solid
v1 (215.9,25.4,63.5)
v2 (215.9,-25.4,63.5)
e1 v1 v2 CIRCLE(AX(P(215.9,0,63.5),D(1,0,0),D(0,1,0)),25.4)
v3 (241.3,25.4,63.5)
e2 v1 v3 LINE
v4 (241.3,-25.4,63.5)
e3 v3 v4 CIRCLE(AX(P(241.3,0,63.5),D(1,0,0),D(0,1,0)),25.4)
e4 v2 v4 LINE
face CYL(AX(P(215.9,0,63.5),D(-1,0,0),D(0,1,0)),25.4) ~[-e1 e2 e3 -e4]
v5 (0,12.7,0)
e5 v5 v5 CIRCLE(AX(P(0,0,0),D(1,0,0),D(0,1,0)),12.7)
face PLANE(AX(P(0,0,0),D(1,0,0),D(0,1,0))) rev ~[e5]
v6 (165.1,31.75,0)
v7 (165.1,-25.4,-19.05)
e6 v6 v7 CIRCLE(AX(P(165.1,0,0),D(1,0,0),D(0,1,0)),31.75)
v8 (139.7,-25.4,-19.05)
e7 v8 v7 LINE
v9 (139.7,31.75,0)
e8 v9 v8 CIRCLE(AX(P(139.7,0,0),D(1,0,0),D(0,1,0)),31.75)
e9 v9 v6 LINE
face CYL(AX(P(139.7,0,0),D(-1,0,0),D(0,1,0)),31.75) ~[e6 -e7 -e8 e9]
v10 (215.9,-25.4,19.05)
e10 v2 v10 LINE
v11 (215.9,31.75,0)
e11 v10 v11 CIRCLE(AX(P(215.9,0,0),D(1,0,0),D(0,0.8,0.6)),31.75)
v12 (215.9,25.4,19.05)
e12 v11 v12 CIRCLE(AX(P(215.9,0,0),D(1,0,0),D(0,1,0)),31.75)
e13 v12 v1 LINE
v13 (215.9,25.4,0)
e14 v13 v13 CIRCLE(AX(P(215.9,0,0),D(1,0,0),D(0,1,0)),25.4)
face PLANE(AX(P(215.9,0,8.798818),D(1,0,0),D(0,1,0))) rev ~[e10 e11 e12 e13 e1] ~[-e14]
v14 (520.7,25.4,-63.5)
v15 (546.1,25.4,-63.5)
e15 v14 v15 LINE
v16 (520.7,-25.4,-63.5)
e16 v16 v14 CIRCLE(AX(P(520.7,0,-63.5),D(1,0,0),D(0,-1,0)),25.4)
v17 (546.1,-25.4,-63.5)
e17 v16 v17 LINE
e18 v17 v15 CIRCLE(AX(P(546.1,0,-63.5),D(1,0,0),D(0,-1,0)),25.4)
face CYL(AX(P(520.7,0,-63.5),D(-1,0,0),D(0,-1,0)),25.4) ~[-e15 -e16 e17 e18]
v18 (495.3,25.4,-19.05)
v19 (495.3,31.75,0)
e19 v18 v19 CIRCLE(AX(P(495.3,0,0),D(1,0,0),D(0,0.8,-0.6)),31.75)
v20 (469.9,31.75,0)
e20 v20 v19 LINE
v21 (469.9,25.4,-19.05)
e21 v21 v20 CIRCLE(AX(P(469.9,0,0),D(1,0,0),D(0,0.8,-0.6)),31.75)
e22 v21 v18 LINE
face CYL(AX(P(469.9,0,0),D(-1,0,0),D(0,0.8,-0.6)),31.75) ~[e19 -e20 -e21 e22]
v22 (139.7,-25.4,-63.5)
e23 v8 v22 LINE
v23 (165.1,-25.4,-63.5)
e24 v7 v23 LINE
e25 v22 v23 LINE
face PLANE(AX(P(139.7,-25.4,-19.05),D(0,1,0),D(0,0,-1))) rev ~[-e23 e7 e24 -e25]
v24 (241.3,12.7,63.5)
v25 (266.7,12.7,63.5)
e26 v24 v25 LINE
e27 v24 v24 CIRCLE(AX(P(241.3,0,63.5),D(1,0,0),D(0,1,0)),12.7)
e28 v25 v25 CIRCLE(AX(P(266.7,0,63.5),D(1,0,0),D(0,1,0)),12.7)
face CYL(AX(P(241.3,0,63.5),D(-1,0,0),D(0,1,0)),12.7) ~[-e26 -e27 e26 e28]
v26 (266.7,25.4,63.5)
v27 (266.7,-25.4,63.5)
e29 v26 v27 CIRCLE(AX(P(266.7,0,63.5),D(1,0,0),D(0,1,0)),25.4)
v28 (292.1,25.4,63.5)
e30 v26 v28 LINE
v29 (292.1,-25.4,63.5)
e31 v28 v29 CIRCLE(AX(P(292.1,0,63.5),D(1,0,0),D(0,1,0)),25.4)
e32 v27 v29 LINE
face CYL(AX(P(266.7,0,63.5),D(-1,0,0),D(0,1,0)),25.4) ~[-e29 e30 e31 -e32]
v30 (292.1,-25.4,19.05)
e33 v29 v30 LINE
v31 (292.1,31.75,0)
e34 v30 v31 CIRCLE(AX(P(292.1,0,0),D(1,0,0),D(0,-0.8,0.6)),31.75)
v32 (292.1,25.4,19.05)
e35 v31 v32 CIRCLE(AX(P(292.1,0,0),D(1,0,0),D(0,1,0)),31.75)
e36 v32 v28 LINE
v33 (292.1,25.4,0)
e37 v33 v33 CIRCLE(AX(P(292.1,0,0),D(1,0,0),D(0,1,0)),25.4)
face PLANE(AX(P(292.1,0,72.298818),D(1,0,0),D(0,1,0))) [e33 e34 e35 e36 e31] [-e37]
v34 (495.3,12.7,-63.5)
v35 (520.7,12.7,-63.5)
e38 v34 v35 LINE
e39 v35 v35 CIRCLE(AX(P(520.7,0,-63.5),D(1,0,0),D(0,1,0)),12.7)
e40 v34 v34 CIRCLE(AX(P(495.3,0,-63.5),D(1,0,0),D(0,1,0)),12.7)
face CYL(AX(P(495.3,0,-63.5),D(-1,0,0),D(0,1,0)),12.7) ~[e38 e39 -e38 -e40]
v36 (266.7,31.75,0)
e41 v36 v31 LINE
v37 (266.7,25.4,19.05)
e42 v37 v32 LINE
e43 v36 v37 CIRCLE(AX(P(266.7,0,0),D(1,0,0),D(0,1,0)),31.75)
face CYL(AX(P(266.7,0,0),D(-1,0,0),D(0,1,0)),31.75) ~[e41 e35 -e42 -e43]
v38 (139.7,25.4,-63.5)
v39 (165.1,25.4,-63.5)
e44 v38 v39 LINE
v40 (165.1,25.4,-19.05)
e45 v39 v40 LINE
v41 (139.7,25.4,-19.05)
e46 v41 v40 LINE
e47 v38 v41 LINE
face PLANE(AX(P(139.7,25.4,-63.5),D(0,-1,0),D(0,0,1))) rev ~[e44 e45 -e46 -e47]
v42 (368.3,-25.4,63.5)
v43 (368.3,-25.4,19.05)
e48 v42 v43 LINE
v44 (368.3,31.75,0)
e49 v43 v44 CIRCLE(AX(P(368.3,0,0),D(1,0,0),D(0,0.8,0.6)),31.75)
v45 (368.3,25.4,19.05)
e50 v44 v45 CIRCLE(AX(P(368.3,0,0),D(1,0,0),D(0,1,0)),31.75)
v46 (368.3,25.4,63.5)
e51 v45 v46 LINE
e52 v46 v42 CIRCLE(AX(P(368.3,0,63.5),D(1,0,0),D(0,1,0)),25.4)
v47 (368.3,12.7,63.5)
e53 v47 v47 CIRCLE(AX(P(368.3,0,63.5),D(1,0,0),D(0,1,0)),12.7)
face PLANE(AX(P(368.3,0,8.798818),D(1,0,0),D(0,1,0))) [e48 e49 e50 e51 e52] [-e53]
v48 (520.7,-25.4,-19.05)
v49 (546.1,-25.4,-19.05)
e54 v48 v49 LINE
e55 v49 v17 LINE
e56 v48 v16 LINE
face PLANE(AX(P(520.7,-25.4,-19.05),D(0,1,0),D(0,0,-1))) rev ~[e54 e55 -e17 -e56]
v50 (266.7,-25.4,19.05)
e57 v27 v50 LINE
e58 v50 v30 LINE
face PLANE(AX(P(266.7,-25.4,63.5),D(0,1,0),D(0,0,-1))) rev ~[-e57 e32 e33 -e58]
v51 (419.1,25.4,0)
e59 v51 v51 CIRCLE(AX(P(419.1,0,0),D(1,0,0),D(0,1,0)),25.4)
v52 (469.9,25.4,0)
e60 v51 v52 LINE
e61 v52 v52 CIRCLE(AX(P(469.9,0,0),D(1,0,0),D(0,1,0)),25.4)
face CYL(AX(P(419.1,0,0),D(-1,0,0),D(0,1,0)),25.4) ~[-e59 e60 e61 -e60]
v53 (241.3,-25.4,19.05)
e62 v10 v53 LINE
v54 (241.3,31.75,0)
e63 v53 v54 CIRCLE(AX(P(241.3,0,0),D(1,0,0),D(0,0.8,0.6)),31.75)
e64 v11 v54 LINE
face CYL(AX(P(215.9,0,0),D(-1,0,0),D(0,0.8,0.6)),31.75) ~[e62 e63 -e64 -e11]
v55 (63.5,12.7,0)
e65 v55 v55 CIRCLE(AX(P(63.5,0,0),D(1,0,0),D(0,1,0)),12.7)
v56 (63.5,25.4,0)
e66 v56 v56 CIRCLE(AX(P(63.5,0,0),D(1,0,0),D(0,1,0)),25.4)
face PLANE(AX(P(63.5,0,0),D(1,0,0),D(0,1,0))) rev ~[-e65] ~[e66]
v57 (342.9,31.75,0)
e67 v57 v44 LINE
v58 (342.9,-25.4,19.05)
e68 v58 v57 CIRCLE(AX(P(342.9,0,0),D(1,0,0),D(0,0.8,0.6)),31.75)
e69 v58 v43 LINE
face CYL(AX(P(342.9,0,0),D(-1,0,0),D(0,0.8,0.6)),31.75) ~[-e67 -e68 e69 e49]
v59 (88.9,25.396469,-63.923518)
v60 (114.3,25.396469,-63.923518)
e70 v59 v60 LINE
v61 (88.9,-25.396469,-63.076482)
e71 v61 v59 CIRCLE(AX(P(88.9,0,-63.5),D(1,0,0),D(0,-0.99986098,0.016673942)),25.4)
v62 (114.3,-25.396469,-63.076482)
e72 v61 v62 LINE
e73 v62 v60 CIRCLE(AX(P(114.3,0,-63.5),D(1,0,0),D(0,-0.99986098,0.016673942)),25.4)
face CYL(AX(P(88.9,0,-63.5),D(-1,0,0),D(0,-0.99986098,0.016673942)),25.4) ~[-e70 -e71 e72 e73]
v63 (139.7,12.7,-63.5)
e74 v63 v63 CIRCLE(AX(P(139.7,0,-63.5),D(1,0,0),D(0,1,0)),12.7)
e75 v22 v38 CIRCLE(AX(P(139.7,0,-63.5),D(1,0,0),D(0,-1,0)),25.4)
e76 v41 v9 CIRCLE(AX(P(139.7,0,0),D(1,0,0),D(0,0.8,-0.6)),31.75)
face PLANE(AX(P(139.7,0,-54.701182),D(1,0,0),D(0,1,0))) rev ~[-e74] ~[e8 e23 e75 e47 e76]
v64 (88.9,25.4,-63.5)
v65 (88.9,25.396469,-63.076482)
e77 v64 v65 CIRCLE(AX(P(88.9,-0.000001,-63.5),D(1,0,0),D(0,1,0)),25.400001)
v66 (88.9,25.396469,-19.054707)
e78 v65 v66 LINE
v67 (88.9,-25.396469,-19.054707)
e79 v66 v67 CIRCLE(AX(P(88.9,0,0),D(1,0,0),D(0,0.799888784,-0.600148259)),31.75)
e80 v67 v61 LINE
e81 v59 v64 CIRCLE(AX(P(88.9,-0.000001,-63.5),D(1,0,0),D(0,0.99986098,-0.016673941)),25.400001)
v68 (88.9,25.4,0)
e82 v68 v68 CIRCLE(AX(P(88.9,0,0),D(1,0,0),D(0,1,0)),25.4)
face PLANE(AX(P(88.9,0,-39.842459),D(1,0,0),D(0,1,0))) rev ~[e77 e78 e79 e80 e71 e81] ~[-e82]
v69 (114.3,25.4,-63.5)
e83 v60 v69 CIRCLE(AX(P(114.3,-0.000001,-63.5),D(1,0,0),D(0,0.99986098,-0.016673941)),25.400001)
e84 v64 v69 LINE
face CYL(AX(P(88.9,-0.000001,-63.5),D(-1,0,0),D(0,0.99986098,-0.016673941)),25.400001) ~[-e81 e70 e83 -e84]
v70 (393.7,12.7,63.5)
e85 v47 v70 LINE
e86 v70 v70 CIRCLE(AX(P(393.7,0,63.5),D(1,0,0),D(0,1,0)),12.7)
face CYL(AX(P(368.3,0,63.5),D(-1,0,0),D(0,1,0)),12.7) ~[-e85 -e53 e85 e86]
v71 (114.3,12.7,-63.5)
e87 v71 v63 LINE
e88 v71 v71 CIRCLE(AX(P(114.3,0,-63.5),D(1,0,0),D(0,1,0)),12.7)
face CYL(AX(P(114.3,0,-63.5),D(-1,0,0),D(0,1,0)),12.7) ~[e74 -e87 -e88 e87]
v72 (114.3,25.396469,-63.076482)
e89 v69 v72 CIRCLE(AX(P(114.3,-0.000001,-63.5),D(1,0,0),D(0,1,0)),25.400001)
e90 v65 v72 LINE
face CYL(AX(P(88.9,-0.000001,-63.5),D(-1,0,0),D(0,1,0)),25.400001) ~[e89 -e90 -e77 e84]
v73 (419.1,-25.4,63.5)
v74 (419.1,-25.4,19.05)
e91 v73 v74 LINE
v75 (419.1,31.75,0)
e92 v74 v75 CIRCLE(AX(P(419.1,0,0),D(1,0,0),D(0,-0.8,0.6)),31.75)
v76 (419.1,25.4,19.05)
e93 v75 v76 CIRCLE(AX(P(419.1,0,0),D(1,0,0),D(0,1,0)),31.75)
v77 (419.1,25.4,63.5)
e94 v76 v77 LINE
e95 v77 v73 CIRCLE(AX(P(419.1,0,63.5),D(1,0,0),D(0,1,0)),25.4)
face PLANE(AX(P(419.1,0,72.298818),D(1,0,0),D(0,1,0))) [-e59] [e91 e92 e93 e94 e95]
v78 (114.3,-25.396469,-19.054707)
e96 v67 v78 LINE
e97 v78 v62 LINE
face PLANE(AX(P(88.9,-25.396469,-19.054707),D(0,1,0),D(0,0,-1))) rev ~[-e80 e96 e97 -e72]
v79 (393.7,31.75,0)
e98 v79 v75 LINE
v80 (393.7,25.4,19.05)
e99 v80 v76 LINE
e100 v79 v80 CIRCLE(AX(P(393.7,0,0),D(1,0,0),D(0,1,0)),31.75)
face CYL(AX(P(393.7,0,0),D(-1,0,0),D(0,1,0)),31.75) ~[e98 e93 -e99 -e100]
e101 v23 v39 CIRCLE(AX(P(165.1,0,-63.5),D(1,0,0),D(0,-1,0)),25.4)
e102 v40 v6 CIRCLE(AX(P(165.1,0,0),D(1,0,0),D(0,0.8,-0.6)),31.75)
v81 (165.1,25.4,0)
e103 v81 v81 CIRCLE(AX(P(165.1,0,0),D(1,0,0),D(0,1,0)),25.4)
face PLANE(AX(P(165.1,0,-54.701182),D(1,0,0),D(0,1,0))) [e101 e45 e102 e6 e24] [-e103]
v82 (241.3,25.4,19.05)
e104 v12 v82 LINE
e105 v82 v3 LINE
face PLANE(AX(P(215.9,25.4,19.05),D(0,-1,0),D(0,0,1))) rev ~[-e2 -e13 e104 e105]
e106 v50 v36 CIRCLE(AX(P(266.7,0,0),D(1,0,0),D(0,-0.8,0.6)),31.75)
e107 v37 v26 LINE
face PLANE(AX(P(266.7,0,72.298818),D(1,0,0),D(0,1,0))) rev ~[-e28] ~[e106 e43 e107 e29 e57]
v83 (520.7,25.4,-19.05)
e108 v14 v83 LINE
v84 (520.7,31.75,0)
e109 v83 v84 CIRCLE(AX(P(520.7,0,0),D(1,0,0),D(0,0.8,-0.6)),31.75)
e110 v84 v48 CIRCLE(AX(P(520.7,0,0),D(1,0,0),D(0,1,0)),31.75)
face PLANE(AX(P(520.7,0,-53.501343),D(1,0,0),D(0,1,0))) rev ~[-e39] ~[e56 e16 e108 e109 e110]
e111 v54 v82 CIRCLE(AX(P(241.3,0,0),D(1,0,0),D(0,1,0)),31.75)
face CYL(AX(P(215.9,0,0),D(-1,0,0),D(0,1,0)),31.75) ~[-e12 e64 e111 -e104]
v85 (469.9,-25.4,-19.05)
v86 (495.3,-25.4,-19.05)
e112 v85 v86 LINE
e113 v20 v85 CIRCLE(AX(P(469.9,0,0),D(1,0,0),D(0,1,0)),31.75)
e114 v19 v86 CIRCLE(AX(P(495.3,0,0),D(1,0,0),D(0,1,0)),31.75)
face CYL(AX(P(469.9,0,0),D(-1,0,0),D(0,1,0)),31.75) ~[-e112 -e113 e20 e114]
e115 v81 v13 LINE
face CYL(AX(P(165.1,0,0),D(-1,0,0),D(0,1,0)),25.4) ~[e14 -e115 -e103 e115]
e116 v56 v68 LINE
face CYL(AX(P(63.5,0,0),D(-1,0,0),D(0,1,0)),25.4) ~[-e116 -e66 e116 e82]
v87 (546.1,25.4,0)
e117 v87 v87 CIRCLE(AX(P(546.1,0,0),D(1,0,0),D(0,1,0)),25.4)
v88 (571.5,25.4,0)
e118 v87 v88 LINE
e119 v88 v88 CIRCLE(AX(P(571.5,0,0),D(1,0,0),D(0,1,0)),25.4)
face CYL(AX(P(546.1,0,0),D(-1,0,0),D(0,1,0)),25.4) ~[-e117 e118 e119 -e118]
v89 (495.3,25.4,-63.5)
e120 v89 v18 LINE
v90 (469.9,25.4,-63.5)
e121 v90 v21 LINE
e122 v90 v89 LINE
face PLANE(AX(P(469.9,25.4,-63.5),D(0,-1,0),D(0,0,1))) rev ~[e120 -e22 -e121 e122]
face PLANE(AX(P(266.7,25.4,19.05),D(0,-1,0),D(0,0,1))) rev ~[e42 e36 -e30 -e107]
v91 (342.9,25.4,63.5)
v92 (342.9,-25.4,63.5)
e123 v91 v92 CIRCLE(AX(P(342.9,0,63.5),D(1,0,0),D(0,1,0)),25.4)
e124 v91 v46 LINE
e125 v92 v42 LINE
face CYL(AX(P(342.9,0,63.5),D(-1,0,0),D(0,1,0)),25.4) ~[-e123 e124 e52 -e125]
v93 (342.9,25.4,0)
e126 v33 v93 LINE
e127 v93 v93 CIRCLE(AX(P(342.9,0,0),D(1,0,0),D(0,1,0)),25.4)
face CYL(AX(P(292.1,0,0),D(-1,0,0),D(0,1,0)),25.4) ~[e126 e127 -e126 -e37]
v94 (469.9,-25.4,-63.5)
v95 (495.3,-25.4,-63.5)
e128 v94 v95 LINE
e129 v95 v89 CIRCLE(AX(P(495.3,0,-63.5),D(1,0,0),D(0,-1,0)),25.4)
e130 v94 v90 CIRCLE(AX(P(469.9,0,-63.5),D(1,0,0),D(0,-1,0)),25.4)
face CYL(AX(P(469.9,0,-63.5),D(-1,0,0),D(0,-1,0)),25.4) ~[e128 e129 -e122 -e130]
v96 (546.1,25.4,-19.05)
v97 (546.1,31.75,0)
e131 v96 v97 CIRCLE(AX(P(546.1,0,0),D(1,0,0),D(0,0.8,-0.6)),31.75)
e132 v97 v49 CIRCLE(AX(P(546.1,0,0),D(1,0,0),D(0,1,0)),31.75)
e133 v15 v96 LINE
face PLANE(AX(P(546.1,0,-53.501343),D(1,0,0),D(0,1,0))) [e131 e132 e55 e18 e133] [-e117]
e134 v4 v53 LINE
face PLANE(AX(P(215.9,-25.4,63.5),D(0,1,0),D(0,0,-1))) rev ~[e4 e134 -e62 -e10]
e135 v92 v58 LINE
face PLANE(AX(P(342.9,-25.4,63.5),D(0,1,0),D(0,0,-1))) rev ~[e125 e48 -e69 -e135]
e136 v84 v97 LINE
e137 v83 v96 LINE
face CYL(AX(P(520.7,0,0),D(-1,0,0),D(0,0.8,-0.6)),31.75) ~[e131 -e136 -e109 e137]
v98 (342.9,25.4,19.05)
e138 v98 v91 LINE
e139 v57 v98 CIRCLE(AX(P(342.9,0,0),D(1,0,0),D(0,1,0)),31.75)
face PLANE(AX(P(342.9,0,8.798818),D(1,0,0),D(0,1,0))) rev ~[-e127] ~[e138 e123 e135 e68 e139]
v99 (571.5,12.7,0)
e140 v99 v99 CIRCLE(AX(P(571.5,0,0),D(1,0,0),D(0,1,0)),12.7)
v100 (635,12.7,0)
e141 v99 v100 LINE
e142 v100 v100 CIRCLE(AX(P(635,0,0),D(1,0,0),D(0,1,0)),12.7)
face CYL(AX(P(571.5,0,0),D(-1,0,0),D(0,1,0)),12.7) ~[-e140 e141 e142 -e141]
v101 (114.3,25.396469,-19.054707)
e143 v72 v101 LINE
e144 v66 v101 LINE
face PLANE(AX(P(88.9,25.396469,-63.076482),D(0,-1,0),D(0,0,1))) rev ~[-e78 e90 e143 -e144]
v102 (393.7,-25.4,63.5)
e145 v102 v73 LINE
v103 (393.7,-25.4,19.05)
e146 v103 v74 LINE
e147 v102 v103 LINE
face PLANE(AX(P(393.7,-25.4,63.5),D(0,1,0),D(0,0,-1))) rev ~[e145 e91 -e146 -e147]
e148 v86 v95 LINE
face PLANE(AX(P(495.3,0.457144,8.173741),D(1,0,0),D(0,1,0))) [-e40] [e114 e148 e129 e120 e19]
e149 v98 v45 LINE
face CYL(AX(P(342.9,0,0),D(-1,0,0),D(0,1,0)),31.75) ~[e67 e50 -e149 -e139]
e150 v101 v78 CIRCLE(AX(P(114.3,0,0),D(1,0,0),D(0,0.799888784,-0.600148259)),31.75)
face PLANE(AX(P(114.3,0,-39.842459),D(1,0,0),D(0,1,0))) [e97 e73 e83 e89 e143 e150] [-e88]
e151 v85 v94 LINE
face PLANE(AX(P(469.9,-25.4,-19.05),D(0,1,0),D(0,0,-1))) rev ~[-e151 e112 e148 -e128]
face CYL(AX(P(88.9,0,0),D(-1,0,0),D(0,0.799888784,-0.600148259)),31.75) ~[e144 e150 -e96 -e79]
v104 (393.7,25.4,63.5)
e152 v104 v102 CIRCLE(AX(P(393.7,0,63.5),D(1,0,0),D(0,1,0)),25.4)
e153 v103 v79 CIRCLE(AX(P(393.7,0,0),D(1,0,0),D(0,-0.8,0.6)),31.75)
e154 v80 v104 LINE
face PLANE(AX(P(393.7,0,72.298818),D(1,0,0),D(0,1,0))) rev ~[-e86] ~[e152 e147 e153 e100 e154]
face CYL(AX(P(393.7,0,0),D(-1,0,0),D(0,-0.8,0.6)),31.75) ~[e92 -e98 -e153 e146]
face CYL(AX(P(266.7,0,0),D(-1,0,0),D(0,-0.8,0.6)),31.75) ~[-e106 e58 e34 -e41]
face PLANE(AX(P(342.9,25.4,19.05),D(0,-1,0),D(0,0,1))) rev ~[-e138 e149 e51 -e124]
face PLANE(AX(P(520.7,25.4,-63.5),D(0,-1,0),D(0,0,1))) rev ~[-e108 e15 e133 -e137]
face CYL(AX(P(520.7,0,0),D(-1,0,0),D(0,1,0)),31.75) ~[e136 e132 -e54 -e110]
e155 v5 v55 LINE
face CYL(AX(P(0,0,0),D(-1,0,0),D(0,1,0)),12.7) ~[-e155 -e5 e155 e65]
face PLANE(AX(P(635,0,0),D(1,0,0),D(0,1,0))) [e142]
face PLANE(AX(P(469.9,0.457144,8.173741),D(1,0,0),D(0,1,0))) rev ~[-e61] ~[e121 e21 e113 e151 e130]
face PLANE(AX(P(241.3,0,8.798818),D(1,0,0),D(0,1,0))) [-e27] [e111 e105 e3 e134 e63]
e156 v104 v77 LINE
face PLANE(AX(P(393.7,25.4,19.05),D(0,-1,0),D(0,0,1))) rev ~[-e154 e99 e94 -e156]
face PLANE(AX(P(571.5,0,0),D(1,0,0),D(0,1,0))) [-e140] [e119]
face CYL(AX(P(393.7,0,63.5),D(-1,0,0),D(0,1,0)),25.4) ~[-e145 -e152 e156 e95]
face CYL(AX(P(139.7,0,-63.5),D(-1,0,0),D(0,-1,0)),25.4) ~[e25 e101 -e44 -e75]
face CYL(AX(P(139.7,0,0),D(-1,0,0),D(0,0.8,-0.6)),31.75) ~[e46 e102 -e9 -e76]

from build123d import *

# Parameters (mm, degrees)
F0_R      = 12.7
F1_DEPTH  = 63.5
F3_R      = 25.4
F4_DEPTH  = 25.4
F6_DEPTH  = 25.4
F7_R      = 12.7
F8_DEPTH  = 25.4
F10_DEPTH = 25.4
F11_R     = 25.4
F12_DEPTH = 50.8
F14_DEPTH = 25.4
F15_R     = 12.7
F16_DEPTH = 25.4
F18_DEPTH = 25.4
F19_R     = 25.4
F20_DEPTH = 50.8
F22_DEPTH = 25.4
F23_R     = 12.7
F24_DEPTH = 25.4
F26_DEPTH = 25.4
F27_R     = 25.4
F28_DEPTH = 50.8
F30_DEPTH = 25.4
F31_R     = 12.7
F32_DEPTH = 25.4
F34_DEPTH = 25.4
F35_R     = 25.4
F36_DEPTH = 25.4
F37_R     = 12.7
F38_DEPTH = 63.5


with BuildPart() as f1:
    # F0 (on Right) → F1 (new body)
    with BuildSketch(Plane.YZ):
        Circle(F0_R)
    extrude(amount=F1_DEPTH)

    # F3 (on face) → F4 (join)
    with BuildSketch(Plane.YZ.offset(63.5)):
        Circle(F3_R)
    extrude(amount=F4_DEPTH)

    # F5 (on face) → F6 (join)
    with BuildSketch(Plane.YZ.offset(88.9)):
        with BuildLine():
            ThreePointArc((25.3964688963, -19.0547072295), (0, -31.75), (-25.3964688963, -19.0547072295))
            Line((-25.3964688963, -19.0547072295), (-25.3964688963, -63.0764818772))
            ThreePointArc((-25.3964688963, -63.0764818772), (0, -38.1), (25.3964688963, -63.0764818772))
            Line((25.3964688963, -63.0764818772), (25.3964688963, -19.0547072295))
        make_face()
        with BuildLine():
            ThreePointArc((31.75, 0), (-10.0430227657, 30.1197641712), (-25.3964688963, -19.0547072295))
            ThreePointArc((-25.3964688963, -19.0547072295), (0, -31.75), (25.3964688963, -19.0547072295))
            ThreePointArc((25.3964688963, -19.0547072295), (30.1197641712, -10.0430227657), (31.75, 0))
        make_face()
        with BuildLine():
            ThreePointArc((25.3964688963, -63.0764818772), (0, -38.1), (-25.3964688963, -63.0764818772))
            Line((-25.3964688963, -63.0764818772), (25.3964688963, -63.9235181228))
            Line((25.3964688963, -63.9235181228), (25.3964688963, -63.0764818772))
        make_face()
        with BuildLine():
            Line((25.3964688963, -63.9235181228), (-25.3964688963, -63.0764818772))
            ThreePointArc((-25.3964688963, -63.0764818772), (-0.4235181228, -88.8964688963), (25.3964688963, -63.9235181228))
        make_face()
        with BuildLine():
            Line((25.3964688963, -63.0764818772), (25.3964688963, -63.9235181228))
            ThreePointArc((25.3964688963, -63.9235181228), (25.3991172087, -63.7117664215), (25.4, -63.5))
            ThreePointArc((25.4, -63.5), (25.3991172087, -63.2882335785), (25.3964688963, -63.0764818772))
        make_face()
    extrude(amount=F6_DEPTH)

    # F7 (on face) → F8 (join)
    with BuildSketch(Plane.YZ.offset(114.3)):
        with Locations((0, -63.5)):
            Circle(F7_R)
    extrude(amount=F8_DEPTH)

    # F9 (on face) → F10 (join)
    with BuildSketch(Plane.YZ.offset(139.7)):
        with BuildLine():
            Line((0, -63.5), (25.4, -63.5))
            ThreePointArc((25.4, -63.5), (0, -38.1), (-25.4, -63.5))
            Line((-25.4, -63.5), (0, -63.5))
        make_face()
        with BuildLine():
            ThreePointArc((-25.4, -63.5), (0, -88.9), (25.4, -63.5))
            Line((25.4, -63.5), (0, -63.5))
            Line((0, -63.5), (-25.4, -63.5))
        make_face()
        with BuildLine():
            ThreePointArc((-25.4, -63.5), (0, -38.1), (25.4, -63.5))
            Line((25.4, -63.5), (25.4, -19.05))
            ThreePointArc((25.4, -19.05), (0, -31.75), (-25.4, -19.05))
            Line((-25.4, -19.05), (-25.4, -63.5))
        make_face()
        with BuildLine():
            ThreePointArc((-25.4, -19.05), (0, -31.75), (25.4, -19.05))
            Line((25.4, -19.05), (25.4, 0))
            ThreePointArc((25.4, 0), (0, -25.4), (-25.4, 0))
            Line((-25.4, 0), (-25.4, -19.05))
        make_face()
        with BuildLine():
            Line((25.4, 0), (25.4, -19.05))
            ThreePointArc((25.4, -19.05), (30.1206947131, -10.040231571), (31.75, 0))
            ThreePointArc((31.75, 0), (-10.040231571, 30.1206947131), (-25.4, -19.05))
            Line((-25.4, -19.05), (-25.4, 0))
            ThreePointArc((-25.4, 0), (0, 25.4), (25.4, 0))
        make_face()
        with BuildLine():
            ThreePointArc((-25.4, 0), (0, -25.4), (25.4, 0))
            ThreePointArc((25.4, 0), (0, 25.4), (-25.4, 0))
        make_face()
    extrude(amount=F10_DEPTH)

    # F11 (on face) → F12 (join)
    with BuildSketch(Plane.YZ.offset(165.1)):
        Circle(F11_R)
    extrude(amount=F12_DEPTH)

    # F13 (on face) → F14 (join)
    with BuildSketch(Plane.YZ.offset(215.9)):
        with BuildLine():
            Line((0, 0), (25.4, 0))
            ThreePointArc((25.4, 0), (0, 25.4), (-25.4, 0))
            Line((-25.4, 0), (0, 0))
        make_face()
        with BuildLine():
            Line((25.4, 19.05), (25.4, 0))
            ThreePointArc((25.4, 0), (0, -25.4), (-25.4, 0))
            Line((-25.4, 0), (-25.4, 19.05))
            ThreePointArc((-25.4, 19.05), (-10.040231571, -30.1206947131), (31.75, 0))
            ThreePointArc((31.75, 0), (30.1206947131, 10.040231571), (25.4, 19.05))
        make_face()
        with BuildLine():
            ThreePointArc((-25.4, 0), (0, -25.4), (25.4, 0))
            Line((25.4, 0), (0, 0))
            Line((0, 0), (-25.4, 0))
        make_face()
        with BuildLine():
            ThreePointArc((-25.4, 0), (0, 25.4), (25.4, 0))
            Line((25.4, 0), (25.4, 19.05))
            ThreePointArc((25.4, 19.05), (0, 31.75), (-25.4, 19.05))
            Line((-25.4, 19.05), (-25.4, 0))
        make_face()
        with BuildLine():
            ThreePointArc((-25.4, 19.05), (0, 31.75), (25.4, 19.05))
            Line((25.4, 19.05), (25.4, 63.5))
            ThreePointArc((25.4, 63.5), (0, 38.1), (-25.4, 63.5))
            Line((-25.4, 63.5), (-25.4, 19.05))
        make_face()
        with BuildLine():
            ThreePointArc((-25.4, 63.5), (0, 38.1), (25.4, 63.5))
            Line((25.4, 63.5), (-25.4, 63.5))
        make_face()
        with BuildLine():
            Line((-25.4, 63.5), (25.4, 63.5))
            ThreePointArc((25.4, 63.5), (0, 88.9), (-25.4, 63.5))
        make_face()
    extrude(amount=F14_DEPTH)

    # F15 (on face) → F16 (join)
    with BuildSketch(Plane.YZ.offset(241.3)):
        with Locations((0, 63.5)):
            Circle(F15_R)
    extrude(amount=F16_DEPTH)

    # F17 (on face) → F18 (join)
    with BuildSketch(Plane.YZ.offset(266.7)):
        with BuildLine():
            Line((-25.4, 63.5), (25.4, 63.5))
            ThreePointArc((25.4, 63.5), (0, 88.9), (-25.4, 63.5))
        make_face()
        with BuildLine():
            Line((25.4, 19.05), (25.4, 63.5))
            ThreePointArc((25.4, 63.5), (0, 38.1), (-25.4, 63.5))
            Line((-25.4, 63.5), (-25.4, 19.05))
            ThreePointArc((-25.4, 19.05), (0, 31.75), (25.4, 19.05))
        make_face()
        with BuildLine():
            ThreePointArc((-25.4, 63.5), (0, 38.1), (25.4, 63.5))
            Line((25.4, 63.5), (-25.4, 63.5))
        make_face()
        with BuildLine():
            ThreePointArc((31.75, 0), (30.1206947131, 10.040231571), (25.4, 19.05))
            Line((25.4, 19.05), (25.4, 0))
            ThreePointArc((25.4, 0), (0, -25.4), (-25.4, 0))
            Line((-25.4, 0), (-25.4, 19.05))
            ThreePointArc((-25.4, 19.05), (-10.040231571, -30.1206947131), (31.75, 0))
        make_face()
        with BuildLine():
            Line((25.4, 0), (25.4, 19.05))
            ThreePointArc((25.4, 19.05), (0, 31.75), (-25.4, 19.05))
            Line((-25.4, 19.05), (-25.4, 0))
            ThreePointArc((-25.4, 0), (0, 25.4), (25.4, 0))
        make_face()
        with BuildLine():
            ThreePointArc((-25.4, 0), (0, -25.4), (25.4, 0))
            ThreePointArc((25.4, 0), (0, 25.4), (-25.4, 0))
        make_face()
    extrude(amount=F18_DEPTH)

    # F19 (on face) → F20 (join)
    with BuildSketch(Plane.YZ.offset(292.1)):
        Circle(F19_R)
    extrude(amount=F20_DEPTH)

    # F21 (on face) → F22 (join)
    with BuildSketch(Plane.YZ.offset(342.9)):
        with BuildLine():
            Line((-25.4, 0), (25.4, 0))
            ThreePointArc((25.4, 0), (0, 25.4), (-25.4, 0))
        make_face()
        with BuildLine():
            ThreePointArc((-25.4, 63.5), (0, 38.1), (25.4, 63.5))
            Line((25.4, 63.5), (-25.4, 63.5))
        make_face()
        with BuildLine():
            Line((25.4, 0), (25.4, 19.05))
            ThreePointArc((25.4, 19.05), (0, 31.75), (-25.4, 19.05))
            Line((-25.4, 19.05), (-25.4, 0))
            ThreePointArc((-25.4, 0), (0, 25.4), (25.4, 0))
        make_face()
        with BuildLine():
            ThreePointArc((-25.4, 19.05), (-10.040231571, -30.1206947131), (31.75, 0))
            ThreePointArc((31.75, 0), (30.1206947131, 10.040231571), (25.4, 19.05))
            Line((25.4, 19.05), (25.4, 0))
            ThreePointArc((25.4, 0), (0, -25.4), (-25.4, 0))
            Line((-25.4, 0), (-25.4, 19.05))
        make_face()
        with BuildLine():
            Line((-25.4, 63.5), (25.4, 63.5))
            ThreePointArc((25.4, 63.5), (0, 88.9), (-25.4, 63.5))
        make_face()
        with BuildLine():
            ThreePointArc((-25.4, 19.05), (0, 31.75), (25.4, 19.05))
            Line((25.4, 19.05), (25.4, 63.5))
            ThreePointArc((25.4, 63.5), (0, 38.1), (-25.4, 63.5))
            Line((-25.4, 63.5), (-25.4, 19.05))
        make_face()
        with BuildLine():
            ThreePointArc((-25.4, 0), (0, -25.4), (25.4, 0))
            Line((25.4, 0), (-25.4, 0))
        make_face()
    extrude(amount=F22_DEPTH)

    # F23 (on face) → F24 (join)
    with BuildSketch(Plane.YZ.offset(368.3)):
        with Locations((0, 63.5)):
            Circle(F23_R)
    extrude(amount=F24_DEPTH)

    # F25 (on face) → F26 (join)
    with BuildSketch(Plane.YZ.offset(393.7)):
        with BuildLine():
            Line((0, 63.5), (25.4, 63.5))
            ThreePointArc((25.4, 63.5), (0, 88.9), (-25.4, 63.5))
            Line((-25.4, 63.5), (0, 63.5))
        make_face()
        with BuildLine():
            Line((25.4, 19.05), (25.4, 63.5))
            ThreePointArc((25.4, 63.5), (0, 38.1), (-25.4, 63.5))
            Line((-25.4, 63.5), (-25.4, 19.05))
            ThreePointArc((-25.4, 19.05), (0, 31.75), (25.4, 19.05))
        make_face()
        with BuildLine():
            ThreePointArc((-25.4, 63.5), (0, 38.1), (25.4, 63.5))
            Line((25.4, 63.5), (0, 63.5))
            Line((0, 63.5), (-25.4, 63.5))
        make_face()
        with BuildLine():
            ThreePointArc((31.75, 0), (30.1206947131, 10.040231571), (25.4, 19.05))
            Line((25.4, 19.05), (25.4, 0))
            Line((25.4, 0), (-25.4, 0))
            Line((-25.4, 0), (-25.4, 19.05))
            ThreePointArc((-25.4, 19.05), (-10.040231571, -30.1206947131), (31.75, 0))
        make_face()
        with BuildLine():
            Line((25.4, 0), (25.4, 19.05))
            ThreePointArc((25.4, 19.05), (0, 31.75), (-25.4, 19.05))
            Line((-25.4, 19.05), (-25.4, 0))
            Line((-25.4, 0), (25.4, 0))
        make_face()
    extrude(amount=F26_DEPTH)

    # F27 (on face) → F28 (join)
    with BuildSketch(Plane.YZ.offset(419.1)):
        Circle(F27_R)
    extrude(amount=F28_DEPTH)

    # F29 (on face) → F30 (join)
    with BuildSketch(Plane.YZ.offset(469.9)):
        with BuildLine():
            ThreePointArc((25.4, -19.05), (30.1206947131, -10.040231571), (31.75, 0))
            ThreePointArc((31.75, 0), (-10.040231571, 30.1206947131), (-25.4, -19.05))
            Line((-25.4, -19.05), (-25.4, 0))
            ThreePointArc((-25.4, 0), (0, 25.4), (25.4, 0))
            Line((25.4, 0), (25.4, -19.05))
        make_face()
        with BuildLine():
            Line((-25.4, 0), (-25.4, -19.05))
            ThreePointArc((-25.4, -19.05), (0, -31.75), (25.4, -19.05))
            Line((25.4, -19.05), (25.4, 0))
            ThreePointArc((25.4, 0), (0, -25.4), (-25.4, 0))
        make_face()
        with BuildLine():
            ThreePointArc((25.4, -19.05), (0, -31.75), (-25.4, -19.05))
            Line((-25.4, -19.05), (-25.4, -63.5))
            ThreePointArc((-25.4, -63.5), (0, -38.1), (25.4, -63.5))
            Line((25.4, -63.5), (25.4, -19.05))
        make_face()
        with BuildLine():
            ThreePointArc((25.4, -63.5), (0, -38.1), (-25.4, -63.5))
            Line((-25.4, -63.5), (25.4, -63.5))
        make_face()
        with BuildLine():
            Line((25.4, -63.5), (-25.4, -63.5))
            ThreePointArc((-25.4, -63.5), (0, -88.9), (25.4, -63.5))
        make_face()
        with BuildLine():
            ThreePointArc((25.4, 0), (0, 25.4), (-25.4, 0))
            Line((-25.4, 0), (25.4, 0))
        make_face()
        with BuildLine():
            Line((25.4, 0), (-25.4, 0))
            ThreePointArc((-25.4, 0), (0, -25.4), (25.4, 0))
        make_face()
    extrude(amount=F30_DEPTH)

    # F31 (on face) → F32 (join)
    with BuildSketch(Plane.YZ.offset(495.3)):
        with Locations((0, -63.5)):
            Circle(F31_R)
    extrude(amount=F32_DEPTH)

    # F33 (on face) → F34 (join)
    with BuildSketch(Plane.YZ.offset(520.7)):
        with BuildLine():
            Line((12.7, -63.5), (25.4, -63.5))
            ThreePointArc((25.4, -63.5), (0, -38.1), (-25.4, -63.5))
            Line((-25.4, -63.5), (-12.7, -63.5))
            ThreePointArc((-12.7, -63.5), (0, -50.8), (12.7, -63.5))
        make_face()
        with BuildLine():
            ThreePointArc((-25.4, -63.5), (0, -88.9), (25.4, -63.5))
            Line((25.4, -63.5), (12.7, -63.5))
            ThreePointArc((12.7, -63.5), (0, -76.2), (-12.7, -63.5))
            Line((-12.7, -63.5), (-25.4, -63.5))
        make_face()
        with BuildLine():
            ThreePointArc((-25.4, -63.5), (0, -38.1), (25.4, -63.5))
            Line((25.4, -63.5), (25.4, -19.05))
            ThreePointArc((25.4, -19.05), (0, -31.75), (-25.4, -19.05))
            Line((-25.4, -19.05), (-25.4, -63.5))
        make_face()
        with BuildLine():
            ThreePointArc((-12.7, -63.5), (0, -76.2), (12.7, -63.5))
            Line((12.7, -63.5), (0, -63.5))
            Line((0, -63.5), (-12.7, -63.5))
        make_face()
        with BuildLine():
            Line((0, -63.5), (12.7, -63.5))
            ThreePointArc((12.7, -63.5), (0, -50.8), (-12.7, -63.5))
            Line((-12.7, -63.5), (0, -63.5))
        make_face()
        with BuildLine():
            ThreePointArc((-25.4, -19.05), (0, -31.75), (25.4, -19.05))
            Line((25.4, -19.05), (25.4, 0))
            ThreePointArc((25.4, 0), (0, -25.4), (-25.4, 0))
            Line((-25.4, 0), (-25.4, -19.05))
        make_face()
        with BuildLine():
            Line((25.4, 0), (25.4, -19.05))
            ThreePointArc((25.4, -19.05), (30.1206947131, -10.040231571), (31.75, 0))
            ThreePointArc((31.75, 0), (-10.040231571, 30.1206947131), (-25.4, -19.05))
            Line((-25.4, -19.05), (-25.4, 0))
            ThreePointArc((-25.4, 0), (0, 25.4), (25.4, 0))
        make_face()
        with BuildLine():
            Line((0, 0), (25.4, 0))
            ThreePointArc((25.4, 0), (0, 25.4), (-25.4, 0))
            Line((-25.4, 0), (0, 0))
        make_face()
        with BuildLine():
            ThreePointArc((-25.4, 0), (0, -25.4), (25.4, 0))
            Line((25.4, 0), (0, 0))
            Line((0, 0), (-25.4, 0))
        make_face()
    extrude(amount=F34_DEPTH)

    # F35 (on face) → F36 (join)
    with BuildSketch(Plane.YZ.offset(546.1)):
        Circle(F35_R)
    extrude(amount=F36_DEPTH)

    # F37 (on face) → F38 (join)
    with BuildSketch(Plane.YZ.offset(571.5)):
        Circle(F37_R)
    extrude(amount=F38_DEPTH)


solid = f1.part
